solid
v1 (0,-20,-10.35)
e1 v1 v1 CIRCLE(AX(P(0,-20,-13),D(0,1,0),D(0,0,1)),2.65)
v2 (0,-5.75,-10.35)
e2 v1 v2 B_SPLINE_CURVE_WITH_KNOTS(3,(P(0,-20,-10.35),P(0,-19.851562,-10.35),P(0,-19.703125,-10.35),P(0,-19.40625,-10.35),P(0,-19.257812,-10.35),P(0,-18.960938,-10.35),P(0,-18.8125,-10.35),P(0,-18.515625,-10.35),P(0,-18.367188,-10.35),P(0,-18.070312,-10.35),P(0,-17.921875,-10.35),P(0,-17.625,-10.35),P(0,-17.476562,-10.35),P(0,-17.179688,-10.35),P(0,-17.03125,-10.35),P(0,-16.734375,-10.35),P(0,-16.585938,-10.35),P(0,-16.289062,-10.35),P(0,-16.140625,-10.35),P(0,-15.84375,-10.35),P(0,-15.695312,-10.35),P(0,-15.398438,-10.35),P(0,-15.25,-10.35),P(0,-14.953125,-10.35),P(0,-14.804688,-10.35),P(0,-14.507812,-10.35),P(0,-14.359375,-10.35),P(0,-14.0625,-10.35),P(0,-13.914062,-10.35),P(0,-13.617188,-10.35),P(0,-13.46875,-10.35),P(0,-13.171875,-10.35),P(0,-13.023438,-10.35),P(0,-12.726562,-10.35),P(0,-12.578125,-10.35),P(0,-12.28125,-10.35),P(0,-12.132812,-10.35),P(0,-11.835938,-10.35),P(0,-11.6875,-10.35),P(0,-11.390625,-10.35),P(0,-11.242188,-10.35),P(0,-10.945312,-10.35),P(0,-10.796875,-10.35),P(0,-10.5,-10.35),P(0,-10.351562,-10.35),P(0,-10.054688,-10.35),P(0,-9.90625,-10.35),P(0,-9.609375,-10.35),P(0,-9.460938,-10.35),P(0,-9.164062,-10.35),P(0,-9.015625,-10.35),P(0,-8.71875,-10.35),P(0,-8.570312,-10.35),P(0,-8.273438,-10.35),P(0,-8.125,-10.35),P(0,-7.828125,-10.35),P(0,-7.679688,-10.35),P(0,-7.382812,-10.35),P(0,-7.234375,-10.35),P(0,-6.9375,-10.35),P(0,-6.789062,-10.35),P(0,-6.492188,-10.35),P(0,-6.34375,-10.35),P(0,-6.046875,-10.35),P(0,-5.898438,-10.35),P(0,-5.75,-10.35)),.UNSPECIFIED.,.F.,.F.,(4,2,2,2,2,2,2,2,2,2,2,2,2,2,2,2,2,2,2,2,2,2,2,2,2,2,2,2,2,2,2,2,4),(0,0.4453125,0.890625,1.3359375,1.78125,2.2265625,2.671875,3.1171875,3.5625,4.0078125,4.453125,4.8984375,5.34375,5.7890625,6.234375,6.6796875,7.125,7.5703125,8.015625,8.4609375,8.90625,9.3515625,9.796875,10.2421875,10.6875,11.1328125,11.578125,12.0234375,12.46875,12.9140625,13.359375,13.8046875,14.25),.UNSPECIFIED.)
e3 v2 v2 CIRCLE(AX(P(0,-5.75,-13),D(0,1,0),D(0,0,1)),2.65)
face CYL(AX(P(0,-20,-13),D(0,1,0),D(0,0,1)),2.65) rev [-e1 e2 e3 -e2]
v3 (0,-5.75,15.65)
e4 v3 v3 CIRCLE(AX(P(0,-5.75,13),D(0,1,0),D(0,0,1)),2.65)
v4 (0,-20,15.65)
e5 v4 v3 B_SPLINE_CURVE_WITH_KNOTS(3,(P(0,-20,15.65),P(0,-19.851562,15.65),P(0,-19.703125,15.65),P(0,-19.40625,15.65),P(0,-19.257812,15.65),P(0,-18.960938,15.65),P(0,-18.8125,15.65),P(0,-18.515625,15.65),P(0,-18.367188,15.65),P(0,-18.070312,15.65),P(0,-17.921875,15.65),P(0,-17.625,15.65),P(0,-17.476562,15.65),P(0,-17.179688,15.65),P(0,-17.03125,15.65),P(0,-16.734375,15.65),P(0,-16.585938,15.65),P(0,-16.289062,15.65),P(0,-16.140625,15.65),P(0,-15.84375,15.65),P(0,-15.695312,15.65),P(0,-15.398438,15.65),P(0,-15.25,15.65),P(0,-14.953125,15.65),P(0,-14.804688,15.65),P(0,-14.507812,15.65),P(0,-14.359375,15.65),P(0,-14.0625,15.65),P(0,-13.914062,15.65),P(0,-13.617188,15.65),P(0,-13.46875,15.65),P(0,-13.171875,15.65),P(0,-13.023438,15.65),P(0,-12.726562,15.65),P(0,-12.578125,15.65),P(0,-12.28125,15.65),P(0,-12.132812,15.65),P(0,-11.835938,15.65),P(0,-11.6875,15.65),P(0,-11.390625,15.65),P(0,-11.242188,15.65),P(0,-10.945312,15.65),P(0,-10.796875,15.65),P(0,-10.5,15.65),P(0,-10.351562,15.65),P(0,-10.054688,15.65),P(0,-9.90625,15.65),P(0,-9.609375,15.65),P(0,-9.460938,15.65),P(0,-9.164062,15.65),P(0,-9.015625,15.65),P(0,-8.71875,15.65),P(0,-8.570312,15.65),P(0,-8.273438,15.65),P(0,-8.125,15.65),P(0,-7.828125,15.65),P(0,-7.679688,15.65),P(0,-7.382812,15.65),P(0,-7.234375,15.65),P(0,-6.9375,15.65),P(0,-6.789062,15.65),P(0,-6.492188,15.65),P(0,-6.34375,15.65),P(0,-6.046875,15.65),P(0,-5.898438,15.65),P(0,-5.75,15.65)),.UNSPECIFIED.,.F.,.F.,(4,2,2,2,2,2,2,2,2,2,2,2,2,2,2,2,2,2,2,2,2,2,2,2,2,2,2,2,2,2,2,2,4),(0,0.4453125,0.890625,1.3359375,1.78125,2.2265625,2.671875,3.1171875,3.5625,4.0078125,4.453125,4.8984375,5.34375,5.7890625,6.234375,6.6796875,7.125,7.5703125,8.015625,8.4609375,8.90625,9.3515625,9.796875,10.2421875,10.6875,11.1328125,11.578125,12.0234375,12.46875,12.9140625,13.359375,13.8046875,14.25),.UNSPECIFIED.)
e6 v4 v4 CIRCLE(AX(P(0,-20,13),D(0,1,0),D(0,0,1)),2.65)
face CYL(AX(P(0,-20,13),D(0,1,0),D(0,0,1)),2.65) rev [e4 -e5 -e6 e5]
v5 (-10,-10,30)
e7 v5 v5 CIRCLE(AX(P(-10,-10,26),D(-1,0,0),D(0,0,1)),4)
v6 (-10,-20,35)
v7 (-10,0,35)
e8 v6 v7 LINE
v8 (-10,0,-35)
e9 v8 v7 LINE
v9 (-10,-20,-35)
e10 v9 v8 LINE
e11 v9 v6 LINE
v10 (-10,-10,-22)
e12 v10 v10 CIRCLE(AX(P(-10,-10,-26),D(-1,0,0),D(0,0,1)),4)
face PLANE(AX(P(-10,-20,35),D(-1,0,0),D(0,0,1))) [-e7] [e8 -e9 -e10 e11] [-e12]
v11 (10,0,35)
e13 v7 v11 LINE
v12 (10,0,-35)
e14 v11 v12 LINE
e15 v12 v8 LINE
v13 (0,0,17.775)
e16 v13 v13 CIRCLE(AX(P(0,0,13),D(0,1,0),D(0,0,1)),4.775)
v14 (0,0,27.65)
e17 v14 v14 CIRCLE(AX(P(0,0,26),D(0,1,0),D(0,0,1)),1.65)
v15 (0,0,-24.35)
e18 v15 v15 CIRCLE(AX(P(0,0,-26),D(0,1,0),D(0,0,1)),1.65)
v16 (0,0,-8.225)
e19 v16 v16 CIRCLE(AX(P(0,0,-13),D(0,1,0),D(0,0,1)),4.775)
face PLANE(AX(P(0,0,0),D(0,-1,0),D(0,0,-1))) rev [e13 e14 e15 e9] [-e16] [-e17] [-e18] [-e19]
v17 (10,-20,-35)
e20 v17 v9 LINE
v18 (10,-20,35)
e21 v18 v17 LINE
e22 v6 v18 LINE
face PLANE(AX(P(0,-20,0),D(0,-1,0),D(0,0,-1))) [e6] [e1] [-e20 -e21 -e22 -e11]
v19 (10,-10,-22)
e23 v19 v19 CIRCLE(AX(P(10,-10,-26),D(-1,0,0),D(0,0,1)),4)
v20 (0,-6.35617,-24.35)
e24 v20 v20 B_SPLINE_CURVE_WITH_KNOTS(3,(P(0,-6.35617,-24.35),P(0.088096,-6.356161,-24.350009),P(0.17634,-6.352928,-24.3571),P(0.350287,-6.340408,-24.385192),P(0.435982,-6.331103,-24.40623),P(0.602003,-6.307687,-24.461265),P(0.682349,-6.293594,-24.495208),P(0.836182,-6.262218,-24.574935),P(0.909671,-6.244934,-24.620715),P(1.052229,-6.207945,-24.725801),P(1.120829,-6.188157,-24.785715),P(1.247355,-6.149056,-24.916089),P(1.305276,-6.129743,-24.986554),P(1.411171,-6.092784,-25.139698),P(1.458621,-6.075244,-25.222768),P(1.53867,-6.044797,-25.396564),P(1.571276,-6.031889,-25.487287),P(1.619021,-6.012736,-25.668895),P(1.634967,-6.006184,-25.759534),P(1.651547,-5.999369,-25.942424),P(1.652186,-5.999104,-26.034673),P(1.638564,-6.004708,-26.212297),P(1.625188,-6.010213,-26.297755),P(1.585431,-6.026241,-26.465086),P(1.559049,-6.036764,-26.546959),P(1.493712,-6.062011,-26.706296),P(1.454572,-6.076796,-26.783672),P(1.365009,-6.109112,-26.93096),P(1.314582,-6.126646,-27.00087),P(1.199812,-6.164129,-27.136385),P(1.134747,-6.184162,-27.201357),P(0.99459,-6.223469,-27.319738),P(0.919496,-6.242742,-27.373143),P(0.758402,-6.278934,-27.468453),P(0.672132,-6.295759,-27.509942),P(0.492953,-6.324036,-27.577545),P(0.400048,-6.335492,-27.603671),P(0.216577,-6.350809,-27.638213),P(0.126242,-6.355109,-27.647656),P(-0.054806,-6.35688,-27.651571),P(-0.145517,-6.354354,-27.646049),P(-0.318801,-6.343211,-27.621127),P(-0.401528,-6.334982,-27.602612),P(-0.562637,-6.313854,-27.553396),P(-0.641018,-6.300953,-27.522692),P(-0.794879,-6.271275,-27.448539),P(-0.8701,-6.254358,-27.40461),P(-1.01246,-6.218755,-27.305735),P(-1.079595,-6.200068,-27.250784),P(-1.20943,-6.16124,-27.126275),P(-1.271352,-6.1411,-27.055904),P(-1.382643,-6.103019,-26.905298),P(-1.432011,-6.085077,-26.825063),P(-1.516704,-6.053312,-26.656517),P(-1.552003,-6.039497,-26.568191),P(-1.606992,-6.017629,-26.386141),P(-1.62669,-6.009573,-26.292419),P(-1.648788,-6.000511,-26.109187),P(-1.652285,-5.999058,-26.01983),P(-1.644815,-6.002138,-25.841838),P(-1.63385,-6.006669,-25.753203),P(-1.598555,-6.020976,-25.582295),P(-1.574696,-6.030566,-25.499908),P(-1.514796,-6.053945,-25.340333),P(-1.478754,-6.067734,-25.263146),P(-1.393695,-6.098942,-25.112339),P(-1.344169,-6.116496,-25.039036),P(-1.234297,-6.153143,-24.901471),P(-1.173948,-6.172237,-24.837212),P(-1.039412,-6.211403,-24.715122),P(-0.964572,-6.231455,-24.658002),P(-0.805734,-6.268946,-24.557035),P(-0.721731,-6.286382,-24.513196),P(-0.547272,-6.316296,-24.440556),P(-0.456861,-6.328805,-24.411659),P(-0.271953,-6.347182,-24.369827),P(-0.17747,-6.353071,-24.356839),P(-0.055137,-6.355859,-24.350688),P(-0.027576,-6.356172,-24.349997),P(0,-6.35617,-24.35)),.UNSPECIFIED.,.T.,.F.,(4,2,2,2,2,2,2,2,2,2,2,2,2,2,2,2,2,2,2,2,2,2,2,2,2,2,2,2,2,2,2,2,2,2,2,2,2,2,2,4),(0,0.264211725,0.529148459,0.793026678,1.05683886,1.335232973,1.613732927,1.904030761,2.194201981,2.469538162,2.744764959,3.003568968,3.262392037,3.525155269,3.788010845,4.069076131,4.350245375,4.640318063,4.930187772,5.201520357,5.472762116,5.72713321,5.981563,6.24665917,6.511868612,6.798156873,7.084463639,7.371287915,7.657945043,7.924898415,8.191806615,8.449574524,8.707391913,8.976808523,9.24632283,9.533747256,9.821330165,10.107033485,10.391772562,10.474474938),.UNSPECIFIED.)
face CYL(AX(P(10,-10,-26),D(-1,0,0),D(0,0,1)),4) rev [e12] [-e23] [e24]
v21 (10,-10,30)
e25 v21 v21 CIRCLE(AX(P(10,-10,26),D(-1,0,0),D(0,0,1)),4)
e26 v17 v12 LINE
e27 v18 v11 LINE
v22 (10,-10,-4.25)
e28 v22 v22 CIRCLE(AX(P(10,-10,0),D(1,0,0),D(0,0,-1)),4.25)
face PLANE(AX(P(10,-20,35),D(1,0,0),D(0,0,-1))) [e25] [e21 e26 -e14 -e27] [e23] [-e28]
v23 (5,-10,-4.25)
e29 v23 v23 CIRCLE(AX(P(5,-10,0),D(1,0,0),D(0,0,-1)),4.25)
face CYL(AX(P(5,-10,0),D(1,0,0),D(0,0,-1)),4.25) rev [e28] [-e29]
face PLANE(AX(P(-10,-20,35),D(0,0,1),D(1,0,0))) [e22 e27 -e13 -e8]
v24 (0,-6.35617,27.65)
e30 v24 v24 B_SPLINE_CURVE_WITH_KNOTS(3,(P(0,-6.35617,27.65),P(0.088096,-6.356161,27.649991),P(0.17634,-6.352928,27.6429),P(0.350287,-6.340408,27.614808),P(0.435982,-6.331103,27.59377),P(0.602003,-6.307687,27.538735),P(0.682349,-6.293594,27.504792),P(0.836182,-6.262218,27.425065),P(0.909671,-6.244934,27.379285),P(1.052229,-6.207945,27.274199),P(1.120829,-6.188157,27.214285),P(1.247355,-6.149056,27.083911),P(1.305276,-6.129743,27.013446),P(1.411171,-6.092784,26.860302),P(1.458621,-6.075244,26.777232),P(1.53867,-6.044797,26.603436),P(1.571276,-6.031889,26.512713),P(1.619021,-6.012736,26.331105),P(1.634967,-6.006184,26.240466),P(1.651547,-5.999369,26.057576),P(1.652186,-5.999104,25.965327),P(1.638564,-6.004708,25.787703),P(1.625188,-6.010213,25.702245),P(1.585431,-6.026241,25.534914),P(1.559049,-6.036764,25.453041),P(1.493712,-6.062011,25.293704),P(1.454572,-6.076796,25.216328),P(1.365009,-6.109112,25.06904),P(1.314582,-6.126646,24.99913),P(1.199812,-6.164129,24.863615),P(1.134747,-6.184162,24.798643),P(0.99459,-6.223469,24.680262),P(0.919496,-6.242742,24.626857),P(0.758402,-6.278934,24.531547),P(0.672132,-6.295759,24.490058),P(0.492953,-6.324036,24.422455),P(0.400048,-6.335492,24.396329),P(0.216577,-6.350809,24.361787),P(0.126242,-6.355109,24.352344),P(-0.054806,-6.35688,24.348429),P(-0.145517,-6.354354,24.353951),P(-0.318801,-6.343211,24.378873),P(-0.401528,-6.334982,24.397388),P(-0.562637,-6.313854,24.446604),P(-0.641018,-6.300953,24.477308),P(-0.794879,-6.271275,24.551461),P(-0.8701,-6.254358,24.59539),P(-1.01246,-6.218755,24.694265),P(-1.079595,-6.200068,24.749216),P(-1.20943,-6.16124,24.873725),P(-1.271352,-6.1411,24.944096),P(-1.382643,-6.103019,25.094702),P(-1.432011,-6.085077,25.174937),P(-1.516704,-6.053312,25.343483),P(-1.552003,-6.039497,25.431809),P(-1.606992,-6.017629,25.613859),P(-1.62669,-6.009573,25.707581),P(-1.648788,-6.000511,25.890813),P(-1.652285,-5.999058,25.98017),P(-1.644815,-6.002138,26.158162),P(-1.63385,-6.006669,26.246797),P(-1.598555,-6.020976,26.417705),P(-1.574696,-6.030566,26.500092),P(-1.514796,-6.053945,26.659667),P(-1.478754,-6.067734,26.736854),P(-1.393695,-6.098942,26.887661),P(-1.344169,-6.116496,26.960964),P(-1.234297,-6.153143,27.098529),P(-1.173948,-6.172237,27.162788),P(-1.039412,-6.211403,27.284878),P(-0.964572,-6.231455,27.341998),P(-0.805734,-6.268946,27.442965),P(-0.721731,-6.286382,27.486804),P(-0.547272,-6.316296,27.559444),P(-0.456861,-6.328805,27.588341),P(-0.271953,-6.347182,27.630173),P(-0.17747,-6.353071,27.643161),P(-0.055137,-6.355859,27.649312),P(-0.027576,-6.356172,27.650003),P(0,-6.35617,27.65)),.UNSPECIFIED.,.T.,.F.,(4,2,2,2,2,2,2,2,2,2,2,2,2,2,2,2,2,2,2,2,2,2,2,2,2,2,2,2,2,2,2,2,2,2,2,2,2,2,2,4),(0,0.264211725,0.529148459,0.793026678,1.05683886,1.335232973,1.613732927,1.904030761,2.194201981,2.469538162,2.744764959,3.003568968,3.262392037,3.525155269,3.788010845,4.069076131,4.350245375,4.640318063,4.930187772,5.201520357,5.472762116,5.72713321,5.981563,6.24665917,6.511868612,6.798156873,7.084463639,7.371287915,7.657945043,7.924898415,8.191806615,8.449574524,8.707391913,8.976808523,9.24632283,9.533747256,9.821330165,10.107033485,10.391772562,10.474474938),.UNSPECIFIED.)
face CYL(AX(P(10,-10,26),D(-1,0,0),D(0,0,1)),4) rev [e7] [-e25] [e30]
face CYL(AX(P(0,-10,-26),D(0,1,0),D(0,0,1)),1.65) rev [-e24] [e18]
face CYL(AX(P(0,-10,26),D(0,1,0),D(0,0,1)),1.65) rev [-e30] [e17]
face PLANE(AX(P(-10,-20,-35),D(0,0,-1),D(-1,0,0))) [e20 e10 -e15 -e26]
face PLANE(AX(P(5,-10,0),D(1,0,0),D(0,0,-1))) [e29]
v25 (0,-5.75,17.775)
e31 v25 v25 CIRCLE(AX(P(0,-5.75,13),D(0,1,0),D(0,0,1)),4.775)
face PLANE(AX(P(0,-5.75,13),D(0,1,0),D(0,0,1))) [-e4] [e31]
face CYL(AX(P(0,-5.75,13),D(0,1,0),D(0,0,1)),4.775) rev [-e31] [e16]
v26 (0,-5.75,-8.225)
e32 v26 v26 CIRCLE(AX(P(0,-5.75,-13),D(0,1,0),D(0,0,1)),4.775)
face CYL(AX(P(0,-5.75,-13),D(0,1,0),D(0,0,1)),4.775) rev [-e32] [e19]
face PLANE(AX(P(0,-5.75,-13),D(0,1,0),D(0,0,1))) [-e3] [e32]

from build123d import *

# Parameters (mm, degrees)
ESBO_O1_W             = 20
ESBO_O1_H             = 70
FLANGE_BASE1_DEPTH    = 20
ESBO_O2_R             = 4.775
CORTE_EXTRUS_O1_DEPTH = 5.75
ESBO_O3_R             = 2.65
CORTE_EXTRUS_O2_DEPTH = 40.090440008
ESBO_O4_R             = 4
CORTE_EXTRUS_O3_DEPTH = 46
ESBO_O6_R             = 1.65
CORTE_EXTRUS_O4_DEPTH = 10
ESBO_O8_R             = 4.25
CORTE_EXTRUS_O6_DEPTH = 5


# Sheet-metal steps are written as plain solids
with BuildPart() as part:
    # Esboço1 → Flange-base1 (new body)
    with BuildSketch(Plane(origin=(0, 0, 0), x_dir=(1, 0, 0), z_dir=(0, 1, 0))):
        Rectangle(ESBO_O1_W, ESBO_O1_H)
    extrude(amount=-FLANGE_BASE1_DEPTH)

    # Esboço2 → Corte-extrusão1 (cut)
    with BuildSketch(Plane(origin=(0, 0, 0), x_dir=(1, 0, 0), z_dir=(0, 1, 0))):
        with Locations(Location((0, 13, 0), (0, 0, 270))):
            Circle(ESBO_O2_R)
        with Locations(Location((0, -13, 0), (0, 0, 270))):
            Circle(ESBO_O2_R)
    extrude(amount=-CORTE_EXTRUS_O1_DEPTH, mode=Mode.SUBTRACT)

    # Esboço3 → Corte-extrusão2 (cut, through all)
    with BuildSketch(Plane(origin=(0, -5.75, 0), x_dir=(1, 0, 0), z_dir=(0, 1, 0))):
        with Locations(Location((0, 13, 0), (0, 0, 270))):
            Circle(ESBO_O3_R)
        with Locations(Location((0, -13, 0), (0, 0, 270))):
            Circle(ESBO_O3_R)
    extrude(amount=-CORTE_EXTRUS_O2_DEPTH, mode=Mode.SUBTRACT)

    # Esboço4 → Corte-extrusão3 (cut, through all)
    with BuildSketch(Plane.ZY.offset(10)):
        with Locations((26, -10)):
            Circle(ESBO_O4_R)
        with Locations((-26, -10)):
            Circle(ESBO_O4_R)
    extrude(amount=-CORTE_EXTRUS_O3_DEPTH, mode=Mode.SUBTRACT)

    # Esboço6 → Corte-extrusão4 (cut)
    with BuildSketch(Plane(origin=(0, 0, 0), x_dir=(1, 0, 0), z_dir=(0, 1, 0))):
        with Locations(Location((0, -26, 0), (0, 0, 270))):
            Circle(ESBO_O6_R)
        with Locations(Location((0, 26, 0), (0, 0, 270))):
            Circle(ESBO_O6_R)
    extrude(amount=-CORTE_EXTRUS_O4_DEPTH, mode=Mode.SUBTRACT)

    # Esboço8 → Corte-extrusão6 (cut)
    with BuildSketch(Plane(origin=(10, 0, 0), x_dir=(0, 0, -1), z_dir=(1, 0, 0))):
        with Locations((0, -10)):
            Circle(ESBO_O8_R)
    extrude(amount=-CORTE_EXTRUS_O6_DEPTH, mode=Mode.SUBTRACT)


solid = part.part
